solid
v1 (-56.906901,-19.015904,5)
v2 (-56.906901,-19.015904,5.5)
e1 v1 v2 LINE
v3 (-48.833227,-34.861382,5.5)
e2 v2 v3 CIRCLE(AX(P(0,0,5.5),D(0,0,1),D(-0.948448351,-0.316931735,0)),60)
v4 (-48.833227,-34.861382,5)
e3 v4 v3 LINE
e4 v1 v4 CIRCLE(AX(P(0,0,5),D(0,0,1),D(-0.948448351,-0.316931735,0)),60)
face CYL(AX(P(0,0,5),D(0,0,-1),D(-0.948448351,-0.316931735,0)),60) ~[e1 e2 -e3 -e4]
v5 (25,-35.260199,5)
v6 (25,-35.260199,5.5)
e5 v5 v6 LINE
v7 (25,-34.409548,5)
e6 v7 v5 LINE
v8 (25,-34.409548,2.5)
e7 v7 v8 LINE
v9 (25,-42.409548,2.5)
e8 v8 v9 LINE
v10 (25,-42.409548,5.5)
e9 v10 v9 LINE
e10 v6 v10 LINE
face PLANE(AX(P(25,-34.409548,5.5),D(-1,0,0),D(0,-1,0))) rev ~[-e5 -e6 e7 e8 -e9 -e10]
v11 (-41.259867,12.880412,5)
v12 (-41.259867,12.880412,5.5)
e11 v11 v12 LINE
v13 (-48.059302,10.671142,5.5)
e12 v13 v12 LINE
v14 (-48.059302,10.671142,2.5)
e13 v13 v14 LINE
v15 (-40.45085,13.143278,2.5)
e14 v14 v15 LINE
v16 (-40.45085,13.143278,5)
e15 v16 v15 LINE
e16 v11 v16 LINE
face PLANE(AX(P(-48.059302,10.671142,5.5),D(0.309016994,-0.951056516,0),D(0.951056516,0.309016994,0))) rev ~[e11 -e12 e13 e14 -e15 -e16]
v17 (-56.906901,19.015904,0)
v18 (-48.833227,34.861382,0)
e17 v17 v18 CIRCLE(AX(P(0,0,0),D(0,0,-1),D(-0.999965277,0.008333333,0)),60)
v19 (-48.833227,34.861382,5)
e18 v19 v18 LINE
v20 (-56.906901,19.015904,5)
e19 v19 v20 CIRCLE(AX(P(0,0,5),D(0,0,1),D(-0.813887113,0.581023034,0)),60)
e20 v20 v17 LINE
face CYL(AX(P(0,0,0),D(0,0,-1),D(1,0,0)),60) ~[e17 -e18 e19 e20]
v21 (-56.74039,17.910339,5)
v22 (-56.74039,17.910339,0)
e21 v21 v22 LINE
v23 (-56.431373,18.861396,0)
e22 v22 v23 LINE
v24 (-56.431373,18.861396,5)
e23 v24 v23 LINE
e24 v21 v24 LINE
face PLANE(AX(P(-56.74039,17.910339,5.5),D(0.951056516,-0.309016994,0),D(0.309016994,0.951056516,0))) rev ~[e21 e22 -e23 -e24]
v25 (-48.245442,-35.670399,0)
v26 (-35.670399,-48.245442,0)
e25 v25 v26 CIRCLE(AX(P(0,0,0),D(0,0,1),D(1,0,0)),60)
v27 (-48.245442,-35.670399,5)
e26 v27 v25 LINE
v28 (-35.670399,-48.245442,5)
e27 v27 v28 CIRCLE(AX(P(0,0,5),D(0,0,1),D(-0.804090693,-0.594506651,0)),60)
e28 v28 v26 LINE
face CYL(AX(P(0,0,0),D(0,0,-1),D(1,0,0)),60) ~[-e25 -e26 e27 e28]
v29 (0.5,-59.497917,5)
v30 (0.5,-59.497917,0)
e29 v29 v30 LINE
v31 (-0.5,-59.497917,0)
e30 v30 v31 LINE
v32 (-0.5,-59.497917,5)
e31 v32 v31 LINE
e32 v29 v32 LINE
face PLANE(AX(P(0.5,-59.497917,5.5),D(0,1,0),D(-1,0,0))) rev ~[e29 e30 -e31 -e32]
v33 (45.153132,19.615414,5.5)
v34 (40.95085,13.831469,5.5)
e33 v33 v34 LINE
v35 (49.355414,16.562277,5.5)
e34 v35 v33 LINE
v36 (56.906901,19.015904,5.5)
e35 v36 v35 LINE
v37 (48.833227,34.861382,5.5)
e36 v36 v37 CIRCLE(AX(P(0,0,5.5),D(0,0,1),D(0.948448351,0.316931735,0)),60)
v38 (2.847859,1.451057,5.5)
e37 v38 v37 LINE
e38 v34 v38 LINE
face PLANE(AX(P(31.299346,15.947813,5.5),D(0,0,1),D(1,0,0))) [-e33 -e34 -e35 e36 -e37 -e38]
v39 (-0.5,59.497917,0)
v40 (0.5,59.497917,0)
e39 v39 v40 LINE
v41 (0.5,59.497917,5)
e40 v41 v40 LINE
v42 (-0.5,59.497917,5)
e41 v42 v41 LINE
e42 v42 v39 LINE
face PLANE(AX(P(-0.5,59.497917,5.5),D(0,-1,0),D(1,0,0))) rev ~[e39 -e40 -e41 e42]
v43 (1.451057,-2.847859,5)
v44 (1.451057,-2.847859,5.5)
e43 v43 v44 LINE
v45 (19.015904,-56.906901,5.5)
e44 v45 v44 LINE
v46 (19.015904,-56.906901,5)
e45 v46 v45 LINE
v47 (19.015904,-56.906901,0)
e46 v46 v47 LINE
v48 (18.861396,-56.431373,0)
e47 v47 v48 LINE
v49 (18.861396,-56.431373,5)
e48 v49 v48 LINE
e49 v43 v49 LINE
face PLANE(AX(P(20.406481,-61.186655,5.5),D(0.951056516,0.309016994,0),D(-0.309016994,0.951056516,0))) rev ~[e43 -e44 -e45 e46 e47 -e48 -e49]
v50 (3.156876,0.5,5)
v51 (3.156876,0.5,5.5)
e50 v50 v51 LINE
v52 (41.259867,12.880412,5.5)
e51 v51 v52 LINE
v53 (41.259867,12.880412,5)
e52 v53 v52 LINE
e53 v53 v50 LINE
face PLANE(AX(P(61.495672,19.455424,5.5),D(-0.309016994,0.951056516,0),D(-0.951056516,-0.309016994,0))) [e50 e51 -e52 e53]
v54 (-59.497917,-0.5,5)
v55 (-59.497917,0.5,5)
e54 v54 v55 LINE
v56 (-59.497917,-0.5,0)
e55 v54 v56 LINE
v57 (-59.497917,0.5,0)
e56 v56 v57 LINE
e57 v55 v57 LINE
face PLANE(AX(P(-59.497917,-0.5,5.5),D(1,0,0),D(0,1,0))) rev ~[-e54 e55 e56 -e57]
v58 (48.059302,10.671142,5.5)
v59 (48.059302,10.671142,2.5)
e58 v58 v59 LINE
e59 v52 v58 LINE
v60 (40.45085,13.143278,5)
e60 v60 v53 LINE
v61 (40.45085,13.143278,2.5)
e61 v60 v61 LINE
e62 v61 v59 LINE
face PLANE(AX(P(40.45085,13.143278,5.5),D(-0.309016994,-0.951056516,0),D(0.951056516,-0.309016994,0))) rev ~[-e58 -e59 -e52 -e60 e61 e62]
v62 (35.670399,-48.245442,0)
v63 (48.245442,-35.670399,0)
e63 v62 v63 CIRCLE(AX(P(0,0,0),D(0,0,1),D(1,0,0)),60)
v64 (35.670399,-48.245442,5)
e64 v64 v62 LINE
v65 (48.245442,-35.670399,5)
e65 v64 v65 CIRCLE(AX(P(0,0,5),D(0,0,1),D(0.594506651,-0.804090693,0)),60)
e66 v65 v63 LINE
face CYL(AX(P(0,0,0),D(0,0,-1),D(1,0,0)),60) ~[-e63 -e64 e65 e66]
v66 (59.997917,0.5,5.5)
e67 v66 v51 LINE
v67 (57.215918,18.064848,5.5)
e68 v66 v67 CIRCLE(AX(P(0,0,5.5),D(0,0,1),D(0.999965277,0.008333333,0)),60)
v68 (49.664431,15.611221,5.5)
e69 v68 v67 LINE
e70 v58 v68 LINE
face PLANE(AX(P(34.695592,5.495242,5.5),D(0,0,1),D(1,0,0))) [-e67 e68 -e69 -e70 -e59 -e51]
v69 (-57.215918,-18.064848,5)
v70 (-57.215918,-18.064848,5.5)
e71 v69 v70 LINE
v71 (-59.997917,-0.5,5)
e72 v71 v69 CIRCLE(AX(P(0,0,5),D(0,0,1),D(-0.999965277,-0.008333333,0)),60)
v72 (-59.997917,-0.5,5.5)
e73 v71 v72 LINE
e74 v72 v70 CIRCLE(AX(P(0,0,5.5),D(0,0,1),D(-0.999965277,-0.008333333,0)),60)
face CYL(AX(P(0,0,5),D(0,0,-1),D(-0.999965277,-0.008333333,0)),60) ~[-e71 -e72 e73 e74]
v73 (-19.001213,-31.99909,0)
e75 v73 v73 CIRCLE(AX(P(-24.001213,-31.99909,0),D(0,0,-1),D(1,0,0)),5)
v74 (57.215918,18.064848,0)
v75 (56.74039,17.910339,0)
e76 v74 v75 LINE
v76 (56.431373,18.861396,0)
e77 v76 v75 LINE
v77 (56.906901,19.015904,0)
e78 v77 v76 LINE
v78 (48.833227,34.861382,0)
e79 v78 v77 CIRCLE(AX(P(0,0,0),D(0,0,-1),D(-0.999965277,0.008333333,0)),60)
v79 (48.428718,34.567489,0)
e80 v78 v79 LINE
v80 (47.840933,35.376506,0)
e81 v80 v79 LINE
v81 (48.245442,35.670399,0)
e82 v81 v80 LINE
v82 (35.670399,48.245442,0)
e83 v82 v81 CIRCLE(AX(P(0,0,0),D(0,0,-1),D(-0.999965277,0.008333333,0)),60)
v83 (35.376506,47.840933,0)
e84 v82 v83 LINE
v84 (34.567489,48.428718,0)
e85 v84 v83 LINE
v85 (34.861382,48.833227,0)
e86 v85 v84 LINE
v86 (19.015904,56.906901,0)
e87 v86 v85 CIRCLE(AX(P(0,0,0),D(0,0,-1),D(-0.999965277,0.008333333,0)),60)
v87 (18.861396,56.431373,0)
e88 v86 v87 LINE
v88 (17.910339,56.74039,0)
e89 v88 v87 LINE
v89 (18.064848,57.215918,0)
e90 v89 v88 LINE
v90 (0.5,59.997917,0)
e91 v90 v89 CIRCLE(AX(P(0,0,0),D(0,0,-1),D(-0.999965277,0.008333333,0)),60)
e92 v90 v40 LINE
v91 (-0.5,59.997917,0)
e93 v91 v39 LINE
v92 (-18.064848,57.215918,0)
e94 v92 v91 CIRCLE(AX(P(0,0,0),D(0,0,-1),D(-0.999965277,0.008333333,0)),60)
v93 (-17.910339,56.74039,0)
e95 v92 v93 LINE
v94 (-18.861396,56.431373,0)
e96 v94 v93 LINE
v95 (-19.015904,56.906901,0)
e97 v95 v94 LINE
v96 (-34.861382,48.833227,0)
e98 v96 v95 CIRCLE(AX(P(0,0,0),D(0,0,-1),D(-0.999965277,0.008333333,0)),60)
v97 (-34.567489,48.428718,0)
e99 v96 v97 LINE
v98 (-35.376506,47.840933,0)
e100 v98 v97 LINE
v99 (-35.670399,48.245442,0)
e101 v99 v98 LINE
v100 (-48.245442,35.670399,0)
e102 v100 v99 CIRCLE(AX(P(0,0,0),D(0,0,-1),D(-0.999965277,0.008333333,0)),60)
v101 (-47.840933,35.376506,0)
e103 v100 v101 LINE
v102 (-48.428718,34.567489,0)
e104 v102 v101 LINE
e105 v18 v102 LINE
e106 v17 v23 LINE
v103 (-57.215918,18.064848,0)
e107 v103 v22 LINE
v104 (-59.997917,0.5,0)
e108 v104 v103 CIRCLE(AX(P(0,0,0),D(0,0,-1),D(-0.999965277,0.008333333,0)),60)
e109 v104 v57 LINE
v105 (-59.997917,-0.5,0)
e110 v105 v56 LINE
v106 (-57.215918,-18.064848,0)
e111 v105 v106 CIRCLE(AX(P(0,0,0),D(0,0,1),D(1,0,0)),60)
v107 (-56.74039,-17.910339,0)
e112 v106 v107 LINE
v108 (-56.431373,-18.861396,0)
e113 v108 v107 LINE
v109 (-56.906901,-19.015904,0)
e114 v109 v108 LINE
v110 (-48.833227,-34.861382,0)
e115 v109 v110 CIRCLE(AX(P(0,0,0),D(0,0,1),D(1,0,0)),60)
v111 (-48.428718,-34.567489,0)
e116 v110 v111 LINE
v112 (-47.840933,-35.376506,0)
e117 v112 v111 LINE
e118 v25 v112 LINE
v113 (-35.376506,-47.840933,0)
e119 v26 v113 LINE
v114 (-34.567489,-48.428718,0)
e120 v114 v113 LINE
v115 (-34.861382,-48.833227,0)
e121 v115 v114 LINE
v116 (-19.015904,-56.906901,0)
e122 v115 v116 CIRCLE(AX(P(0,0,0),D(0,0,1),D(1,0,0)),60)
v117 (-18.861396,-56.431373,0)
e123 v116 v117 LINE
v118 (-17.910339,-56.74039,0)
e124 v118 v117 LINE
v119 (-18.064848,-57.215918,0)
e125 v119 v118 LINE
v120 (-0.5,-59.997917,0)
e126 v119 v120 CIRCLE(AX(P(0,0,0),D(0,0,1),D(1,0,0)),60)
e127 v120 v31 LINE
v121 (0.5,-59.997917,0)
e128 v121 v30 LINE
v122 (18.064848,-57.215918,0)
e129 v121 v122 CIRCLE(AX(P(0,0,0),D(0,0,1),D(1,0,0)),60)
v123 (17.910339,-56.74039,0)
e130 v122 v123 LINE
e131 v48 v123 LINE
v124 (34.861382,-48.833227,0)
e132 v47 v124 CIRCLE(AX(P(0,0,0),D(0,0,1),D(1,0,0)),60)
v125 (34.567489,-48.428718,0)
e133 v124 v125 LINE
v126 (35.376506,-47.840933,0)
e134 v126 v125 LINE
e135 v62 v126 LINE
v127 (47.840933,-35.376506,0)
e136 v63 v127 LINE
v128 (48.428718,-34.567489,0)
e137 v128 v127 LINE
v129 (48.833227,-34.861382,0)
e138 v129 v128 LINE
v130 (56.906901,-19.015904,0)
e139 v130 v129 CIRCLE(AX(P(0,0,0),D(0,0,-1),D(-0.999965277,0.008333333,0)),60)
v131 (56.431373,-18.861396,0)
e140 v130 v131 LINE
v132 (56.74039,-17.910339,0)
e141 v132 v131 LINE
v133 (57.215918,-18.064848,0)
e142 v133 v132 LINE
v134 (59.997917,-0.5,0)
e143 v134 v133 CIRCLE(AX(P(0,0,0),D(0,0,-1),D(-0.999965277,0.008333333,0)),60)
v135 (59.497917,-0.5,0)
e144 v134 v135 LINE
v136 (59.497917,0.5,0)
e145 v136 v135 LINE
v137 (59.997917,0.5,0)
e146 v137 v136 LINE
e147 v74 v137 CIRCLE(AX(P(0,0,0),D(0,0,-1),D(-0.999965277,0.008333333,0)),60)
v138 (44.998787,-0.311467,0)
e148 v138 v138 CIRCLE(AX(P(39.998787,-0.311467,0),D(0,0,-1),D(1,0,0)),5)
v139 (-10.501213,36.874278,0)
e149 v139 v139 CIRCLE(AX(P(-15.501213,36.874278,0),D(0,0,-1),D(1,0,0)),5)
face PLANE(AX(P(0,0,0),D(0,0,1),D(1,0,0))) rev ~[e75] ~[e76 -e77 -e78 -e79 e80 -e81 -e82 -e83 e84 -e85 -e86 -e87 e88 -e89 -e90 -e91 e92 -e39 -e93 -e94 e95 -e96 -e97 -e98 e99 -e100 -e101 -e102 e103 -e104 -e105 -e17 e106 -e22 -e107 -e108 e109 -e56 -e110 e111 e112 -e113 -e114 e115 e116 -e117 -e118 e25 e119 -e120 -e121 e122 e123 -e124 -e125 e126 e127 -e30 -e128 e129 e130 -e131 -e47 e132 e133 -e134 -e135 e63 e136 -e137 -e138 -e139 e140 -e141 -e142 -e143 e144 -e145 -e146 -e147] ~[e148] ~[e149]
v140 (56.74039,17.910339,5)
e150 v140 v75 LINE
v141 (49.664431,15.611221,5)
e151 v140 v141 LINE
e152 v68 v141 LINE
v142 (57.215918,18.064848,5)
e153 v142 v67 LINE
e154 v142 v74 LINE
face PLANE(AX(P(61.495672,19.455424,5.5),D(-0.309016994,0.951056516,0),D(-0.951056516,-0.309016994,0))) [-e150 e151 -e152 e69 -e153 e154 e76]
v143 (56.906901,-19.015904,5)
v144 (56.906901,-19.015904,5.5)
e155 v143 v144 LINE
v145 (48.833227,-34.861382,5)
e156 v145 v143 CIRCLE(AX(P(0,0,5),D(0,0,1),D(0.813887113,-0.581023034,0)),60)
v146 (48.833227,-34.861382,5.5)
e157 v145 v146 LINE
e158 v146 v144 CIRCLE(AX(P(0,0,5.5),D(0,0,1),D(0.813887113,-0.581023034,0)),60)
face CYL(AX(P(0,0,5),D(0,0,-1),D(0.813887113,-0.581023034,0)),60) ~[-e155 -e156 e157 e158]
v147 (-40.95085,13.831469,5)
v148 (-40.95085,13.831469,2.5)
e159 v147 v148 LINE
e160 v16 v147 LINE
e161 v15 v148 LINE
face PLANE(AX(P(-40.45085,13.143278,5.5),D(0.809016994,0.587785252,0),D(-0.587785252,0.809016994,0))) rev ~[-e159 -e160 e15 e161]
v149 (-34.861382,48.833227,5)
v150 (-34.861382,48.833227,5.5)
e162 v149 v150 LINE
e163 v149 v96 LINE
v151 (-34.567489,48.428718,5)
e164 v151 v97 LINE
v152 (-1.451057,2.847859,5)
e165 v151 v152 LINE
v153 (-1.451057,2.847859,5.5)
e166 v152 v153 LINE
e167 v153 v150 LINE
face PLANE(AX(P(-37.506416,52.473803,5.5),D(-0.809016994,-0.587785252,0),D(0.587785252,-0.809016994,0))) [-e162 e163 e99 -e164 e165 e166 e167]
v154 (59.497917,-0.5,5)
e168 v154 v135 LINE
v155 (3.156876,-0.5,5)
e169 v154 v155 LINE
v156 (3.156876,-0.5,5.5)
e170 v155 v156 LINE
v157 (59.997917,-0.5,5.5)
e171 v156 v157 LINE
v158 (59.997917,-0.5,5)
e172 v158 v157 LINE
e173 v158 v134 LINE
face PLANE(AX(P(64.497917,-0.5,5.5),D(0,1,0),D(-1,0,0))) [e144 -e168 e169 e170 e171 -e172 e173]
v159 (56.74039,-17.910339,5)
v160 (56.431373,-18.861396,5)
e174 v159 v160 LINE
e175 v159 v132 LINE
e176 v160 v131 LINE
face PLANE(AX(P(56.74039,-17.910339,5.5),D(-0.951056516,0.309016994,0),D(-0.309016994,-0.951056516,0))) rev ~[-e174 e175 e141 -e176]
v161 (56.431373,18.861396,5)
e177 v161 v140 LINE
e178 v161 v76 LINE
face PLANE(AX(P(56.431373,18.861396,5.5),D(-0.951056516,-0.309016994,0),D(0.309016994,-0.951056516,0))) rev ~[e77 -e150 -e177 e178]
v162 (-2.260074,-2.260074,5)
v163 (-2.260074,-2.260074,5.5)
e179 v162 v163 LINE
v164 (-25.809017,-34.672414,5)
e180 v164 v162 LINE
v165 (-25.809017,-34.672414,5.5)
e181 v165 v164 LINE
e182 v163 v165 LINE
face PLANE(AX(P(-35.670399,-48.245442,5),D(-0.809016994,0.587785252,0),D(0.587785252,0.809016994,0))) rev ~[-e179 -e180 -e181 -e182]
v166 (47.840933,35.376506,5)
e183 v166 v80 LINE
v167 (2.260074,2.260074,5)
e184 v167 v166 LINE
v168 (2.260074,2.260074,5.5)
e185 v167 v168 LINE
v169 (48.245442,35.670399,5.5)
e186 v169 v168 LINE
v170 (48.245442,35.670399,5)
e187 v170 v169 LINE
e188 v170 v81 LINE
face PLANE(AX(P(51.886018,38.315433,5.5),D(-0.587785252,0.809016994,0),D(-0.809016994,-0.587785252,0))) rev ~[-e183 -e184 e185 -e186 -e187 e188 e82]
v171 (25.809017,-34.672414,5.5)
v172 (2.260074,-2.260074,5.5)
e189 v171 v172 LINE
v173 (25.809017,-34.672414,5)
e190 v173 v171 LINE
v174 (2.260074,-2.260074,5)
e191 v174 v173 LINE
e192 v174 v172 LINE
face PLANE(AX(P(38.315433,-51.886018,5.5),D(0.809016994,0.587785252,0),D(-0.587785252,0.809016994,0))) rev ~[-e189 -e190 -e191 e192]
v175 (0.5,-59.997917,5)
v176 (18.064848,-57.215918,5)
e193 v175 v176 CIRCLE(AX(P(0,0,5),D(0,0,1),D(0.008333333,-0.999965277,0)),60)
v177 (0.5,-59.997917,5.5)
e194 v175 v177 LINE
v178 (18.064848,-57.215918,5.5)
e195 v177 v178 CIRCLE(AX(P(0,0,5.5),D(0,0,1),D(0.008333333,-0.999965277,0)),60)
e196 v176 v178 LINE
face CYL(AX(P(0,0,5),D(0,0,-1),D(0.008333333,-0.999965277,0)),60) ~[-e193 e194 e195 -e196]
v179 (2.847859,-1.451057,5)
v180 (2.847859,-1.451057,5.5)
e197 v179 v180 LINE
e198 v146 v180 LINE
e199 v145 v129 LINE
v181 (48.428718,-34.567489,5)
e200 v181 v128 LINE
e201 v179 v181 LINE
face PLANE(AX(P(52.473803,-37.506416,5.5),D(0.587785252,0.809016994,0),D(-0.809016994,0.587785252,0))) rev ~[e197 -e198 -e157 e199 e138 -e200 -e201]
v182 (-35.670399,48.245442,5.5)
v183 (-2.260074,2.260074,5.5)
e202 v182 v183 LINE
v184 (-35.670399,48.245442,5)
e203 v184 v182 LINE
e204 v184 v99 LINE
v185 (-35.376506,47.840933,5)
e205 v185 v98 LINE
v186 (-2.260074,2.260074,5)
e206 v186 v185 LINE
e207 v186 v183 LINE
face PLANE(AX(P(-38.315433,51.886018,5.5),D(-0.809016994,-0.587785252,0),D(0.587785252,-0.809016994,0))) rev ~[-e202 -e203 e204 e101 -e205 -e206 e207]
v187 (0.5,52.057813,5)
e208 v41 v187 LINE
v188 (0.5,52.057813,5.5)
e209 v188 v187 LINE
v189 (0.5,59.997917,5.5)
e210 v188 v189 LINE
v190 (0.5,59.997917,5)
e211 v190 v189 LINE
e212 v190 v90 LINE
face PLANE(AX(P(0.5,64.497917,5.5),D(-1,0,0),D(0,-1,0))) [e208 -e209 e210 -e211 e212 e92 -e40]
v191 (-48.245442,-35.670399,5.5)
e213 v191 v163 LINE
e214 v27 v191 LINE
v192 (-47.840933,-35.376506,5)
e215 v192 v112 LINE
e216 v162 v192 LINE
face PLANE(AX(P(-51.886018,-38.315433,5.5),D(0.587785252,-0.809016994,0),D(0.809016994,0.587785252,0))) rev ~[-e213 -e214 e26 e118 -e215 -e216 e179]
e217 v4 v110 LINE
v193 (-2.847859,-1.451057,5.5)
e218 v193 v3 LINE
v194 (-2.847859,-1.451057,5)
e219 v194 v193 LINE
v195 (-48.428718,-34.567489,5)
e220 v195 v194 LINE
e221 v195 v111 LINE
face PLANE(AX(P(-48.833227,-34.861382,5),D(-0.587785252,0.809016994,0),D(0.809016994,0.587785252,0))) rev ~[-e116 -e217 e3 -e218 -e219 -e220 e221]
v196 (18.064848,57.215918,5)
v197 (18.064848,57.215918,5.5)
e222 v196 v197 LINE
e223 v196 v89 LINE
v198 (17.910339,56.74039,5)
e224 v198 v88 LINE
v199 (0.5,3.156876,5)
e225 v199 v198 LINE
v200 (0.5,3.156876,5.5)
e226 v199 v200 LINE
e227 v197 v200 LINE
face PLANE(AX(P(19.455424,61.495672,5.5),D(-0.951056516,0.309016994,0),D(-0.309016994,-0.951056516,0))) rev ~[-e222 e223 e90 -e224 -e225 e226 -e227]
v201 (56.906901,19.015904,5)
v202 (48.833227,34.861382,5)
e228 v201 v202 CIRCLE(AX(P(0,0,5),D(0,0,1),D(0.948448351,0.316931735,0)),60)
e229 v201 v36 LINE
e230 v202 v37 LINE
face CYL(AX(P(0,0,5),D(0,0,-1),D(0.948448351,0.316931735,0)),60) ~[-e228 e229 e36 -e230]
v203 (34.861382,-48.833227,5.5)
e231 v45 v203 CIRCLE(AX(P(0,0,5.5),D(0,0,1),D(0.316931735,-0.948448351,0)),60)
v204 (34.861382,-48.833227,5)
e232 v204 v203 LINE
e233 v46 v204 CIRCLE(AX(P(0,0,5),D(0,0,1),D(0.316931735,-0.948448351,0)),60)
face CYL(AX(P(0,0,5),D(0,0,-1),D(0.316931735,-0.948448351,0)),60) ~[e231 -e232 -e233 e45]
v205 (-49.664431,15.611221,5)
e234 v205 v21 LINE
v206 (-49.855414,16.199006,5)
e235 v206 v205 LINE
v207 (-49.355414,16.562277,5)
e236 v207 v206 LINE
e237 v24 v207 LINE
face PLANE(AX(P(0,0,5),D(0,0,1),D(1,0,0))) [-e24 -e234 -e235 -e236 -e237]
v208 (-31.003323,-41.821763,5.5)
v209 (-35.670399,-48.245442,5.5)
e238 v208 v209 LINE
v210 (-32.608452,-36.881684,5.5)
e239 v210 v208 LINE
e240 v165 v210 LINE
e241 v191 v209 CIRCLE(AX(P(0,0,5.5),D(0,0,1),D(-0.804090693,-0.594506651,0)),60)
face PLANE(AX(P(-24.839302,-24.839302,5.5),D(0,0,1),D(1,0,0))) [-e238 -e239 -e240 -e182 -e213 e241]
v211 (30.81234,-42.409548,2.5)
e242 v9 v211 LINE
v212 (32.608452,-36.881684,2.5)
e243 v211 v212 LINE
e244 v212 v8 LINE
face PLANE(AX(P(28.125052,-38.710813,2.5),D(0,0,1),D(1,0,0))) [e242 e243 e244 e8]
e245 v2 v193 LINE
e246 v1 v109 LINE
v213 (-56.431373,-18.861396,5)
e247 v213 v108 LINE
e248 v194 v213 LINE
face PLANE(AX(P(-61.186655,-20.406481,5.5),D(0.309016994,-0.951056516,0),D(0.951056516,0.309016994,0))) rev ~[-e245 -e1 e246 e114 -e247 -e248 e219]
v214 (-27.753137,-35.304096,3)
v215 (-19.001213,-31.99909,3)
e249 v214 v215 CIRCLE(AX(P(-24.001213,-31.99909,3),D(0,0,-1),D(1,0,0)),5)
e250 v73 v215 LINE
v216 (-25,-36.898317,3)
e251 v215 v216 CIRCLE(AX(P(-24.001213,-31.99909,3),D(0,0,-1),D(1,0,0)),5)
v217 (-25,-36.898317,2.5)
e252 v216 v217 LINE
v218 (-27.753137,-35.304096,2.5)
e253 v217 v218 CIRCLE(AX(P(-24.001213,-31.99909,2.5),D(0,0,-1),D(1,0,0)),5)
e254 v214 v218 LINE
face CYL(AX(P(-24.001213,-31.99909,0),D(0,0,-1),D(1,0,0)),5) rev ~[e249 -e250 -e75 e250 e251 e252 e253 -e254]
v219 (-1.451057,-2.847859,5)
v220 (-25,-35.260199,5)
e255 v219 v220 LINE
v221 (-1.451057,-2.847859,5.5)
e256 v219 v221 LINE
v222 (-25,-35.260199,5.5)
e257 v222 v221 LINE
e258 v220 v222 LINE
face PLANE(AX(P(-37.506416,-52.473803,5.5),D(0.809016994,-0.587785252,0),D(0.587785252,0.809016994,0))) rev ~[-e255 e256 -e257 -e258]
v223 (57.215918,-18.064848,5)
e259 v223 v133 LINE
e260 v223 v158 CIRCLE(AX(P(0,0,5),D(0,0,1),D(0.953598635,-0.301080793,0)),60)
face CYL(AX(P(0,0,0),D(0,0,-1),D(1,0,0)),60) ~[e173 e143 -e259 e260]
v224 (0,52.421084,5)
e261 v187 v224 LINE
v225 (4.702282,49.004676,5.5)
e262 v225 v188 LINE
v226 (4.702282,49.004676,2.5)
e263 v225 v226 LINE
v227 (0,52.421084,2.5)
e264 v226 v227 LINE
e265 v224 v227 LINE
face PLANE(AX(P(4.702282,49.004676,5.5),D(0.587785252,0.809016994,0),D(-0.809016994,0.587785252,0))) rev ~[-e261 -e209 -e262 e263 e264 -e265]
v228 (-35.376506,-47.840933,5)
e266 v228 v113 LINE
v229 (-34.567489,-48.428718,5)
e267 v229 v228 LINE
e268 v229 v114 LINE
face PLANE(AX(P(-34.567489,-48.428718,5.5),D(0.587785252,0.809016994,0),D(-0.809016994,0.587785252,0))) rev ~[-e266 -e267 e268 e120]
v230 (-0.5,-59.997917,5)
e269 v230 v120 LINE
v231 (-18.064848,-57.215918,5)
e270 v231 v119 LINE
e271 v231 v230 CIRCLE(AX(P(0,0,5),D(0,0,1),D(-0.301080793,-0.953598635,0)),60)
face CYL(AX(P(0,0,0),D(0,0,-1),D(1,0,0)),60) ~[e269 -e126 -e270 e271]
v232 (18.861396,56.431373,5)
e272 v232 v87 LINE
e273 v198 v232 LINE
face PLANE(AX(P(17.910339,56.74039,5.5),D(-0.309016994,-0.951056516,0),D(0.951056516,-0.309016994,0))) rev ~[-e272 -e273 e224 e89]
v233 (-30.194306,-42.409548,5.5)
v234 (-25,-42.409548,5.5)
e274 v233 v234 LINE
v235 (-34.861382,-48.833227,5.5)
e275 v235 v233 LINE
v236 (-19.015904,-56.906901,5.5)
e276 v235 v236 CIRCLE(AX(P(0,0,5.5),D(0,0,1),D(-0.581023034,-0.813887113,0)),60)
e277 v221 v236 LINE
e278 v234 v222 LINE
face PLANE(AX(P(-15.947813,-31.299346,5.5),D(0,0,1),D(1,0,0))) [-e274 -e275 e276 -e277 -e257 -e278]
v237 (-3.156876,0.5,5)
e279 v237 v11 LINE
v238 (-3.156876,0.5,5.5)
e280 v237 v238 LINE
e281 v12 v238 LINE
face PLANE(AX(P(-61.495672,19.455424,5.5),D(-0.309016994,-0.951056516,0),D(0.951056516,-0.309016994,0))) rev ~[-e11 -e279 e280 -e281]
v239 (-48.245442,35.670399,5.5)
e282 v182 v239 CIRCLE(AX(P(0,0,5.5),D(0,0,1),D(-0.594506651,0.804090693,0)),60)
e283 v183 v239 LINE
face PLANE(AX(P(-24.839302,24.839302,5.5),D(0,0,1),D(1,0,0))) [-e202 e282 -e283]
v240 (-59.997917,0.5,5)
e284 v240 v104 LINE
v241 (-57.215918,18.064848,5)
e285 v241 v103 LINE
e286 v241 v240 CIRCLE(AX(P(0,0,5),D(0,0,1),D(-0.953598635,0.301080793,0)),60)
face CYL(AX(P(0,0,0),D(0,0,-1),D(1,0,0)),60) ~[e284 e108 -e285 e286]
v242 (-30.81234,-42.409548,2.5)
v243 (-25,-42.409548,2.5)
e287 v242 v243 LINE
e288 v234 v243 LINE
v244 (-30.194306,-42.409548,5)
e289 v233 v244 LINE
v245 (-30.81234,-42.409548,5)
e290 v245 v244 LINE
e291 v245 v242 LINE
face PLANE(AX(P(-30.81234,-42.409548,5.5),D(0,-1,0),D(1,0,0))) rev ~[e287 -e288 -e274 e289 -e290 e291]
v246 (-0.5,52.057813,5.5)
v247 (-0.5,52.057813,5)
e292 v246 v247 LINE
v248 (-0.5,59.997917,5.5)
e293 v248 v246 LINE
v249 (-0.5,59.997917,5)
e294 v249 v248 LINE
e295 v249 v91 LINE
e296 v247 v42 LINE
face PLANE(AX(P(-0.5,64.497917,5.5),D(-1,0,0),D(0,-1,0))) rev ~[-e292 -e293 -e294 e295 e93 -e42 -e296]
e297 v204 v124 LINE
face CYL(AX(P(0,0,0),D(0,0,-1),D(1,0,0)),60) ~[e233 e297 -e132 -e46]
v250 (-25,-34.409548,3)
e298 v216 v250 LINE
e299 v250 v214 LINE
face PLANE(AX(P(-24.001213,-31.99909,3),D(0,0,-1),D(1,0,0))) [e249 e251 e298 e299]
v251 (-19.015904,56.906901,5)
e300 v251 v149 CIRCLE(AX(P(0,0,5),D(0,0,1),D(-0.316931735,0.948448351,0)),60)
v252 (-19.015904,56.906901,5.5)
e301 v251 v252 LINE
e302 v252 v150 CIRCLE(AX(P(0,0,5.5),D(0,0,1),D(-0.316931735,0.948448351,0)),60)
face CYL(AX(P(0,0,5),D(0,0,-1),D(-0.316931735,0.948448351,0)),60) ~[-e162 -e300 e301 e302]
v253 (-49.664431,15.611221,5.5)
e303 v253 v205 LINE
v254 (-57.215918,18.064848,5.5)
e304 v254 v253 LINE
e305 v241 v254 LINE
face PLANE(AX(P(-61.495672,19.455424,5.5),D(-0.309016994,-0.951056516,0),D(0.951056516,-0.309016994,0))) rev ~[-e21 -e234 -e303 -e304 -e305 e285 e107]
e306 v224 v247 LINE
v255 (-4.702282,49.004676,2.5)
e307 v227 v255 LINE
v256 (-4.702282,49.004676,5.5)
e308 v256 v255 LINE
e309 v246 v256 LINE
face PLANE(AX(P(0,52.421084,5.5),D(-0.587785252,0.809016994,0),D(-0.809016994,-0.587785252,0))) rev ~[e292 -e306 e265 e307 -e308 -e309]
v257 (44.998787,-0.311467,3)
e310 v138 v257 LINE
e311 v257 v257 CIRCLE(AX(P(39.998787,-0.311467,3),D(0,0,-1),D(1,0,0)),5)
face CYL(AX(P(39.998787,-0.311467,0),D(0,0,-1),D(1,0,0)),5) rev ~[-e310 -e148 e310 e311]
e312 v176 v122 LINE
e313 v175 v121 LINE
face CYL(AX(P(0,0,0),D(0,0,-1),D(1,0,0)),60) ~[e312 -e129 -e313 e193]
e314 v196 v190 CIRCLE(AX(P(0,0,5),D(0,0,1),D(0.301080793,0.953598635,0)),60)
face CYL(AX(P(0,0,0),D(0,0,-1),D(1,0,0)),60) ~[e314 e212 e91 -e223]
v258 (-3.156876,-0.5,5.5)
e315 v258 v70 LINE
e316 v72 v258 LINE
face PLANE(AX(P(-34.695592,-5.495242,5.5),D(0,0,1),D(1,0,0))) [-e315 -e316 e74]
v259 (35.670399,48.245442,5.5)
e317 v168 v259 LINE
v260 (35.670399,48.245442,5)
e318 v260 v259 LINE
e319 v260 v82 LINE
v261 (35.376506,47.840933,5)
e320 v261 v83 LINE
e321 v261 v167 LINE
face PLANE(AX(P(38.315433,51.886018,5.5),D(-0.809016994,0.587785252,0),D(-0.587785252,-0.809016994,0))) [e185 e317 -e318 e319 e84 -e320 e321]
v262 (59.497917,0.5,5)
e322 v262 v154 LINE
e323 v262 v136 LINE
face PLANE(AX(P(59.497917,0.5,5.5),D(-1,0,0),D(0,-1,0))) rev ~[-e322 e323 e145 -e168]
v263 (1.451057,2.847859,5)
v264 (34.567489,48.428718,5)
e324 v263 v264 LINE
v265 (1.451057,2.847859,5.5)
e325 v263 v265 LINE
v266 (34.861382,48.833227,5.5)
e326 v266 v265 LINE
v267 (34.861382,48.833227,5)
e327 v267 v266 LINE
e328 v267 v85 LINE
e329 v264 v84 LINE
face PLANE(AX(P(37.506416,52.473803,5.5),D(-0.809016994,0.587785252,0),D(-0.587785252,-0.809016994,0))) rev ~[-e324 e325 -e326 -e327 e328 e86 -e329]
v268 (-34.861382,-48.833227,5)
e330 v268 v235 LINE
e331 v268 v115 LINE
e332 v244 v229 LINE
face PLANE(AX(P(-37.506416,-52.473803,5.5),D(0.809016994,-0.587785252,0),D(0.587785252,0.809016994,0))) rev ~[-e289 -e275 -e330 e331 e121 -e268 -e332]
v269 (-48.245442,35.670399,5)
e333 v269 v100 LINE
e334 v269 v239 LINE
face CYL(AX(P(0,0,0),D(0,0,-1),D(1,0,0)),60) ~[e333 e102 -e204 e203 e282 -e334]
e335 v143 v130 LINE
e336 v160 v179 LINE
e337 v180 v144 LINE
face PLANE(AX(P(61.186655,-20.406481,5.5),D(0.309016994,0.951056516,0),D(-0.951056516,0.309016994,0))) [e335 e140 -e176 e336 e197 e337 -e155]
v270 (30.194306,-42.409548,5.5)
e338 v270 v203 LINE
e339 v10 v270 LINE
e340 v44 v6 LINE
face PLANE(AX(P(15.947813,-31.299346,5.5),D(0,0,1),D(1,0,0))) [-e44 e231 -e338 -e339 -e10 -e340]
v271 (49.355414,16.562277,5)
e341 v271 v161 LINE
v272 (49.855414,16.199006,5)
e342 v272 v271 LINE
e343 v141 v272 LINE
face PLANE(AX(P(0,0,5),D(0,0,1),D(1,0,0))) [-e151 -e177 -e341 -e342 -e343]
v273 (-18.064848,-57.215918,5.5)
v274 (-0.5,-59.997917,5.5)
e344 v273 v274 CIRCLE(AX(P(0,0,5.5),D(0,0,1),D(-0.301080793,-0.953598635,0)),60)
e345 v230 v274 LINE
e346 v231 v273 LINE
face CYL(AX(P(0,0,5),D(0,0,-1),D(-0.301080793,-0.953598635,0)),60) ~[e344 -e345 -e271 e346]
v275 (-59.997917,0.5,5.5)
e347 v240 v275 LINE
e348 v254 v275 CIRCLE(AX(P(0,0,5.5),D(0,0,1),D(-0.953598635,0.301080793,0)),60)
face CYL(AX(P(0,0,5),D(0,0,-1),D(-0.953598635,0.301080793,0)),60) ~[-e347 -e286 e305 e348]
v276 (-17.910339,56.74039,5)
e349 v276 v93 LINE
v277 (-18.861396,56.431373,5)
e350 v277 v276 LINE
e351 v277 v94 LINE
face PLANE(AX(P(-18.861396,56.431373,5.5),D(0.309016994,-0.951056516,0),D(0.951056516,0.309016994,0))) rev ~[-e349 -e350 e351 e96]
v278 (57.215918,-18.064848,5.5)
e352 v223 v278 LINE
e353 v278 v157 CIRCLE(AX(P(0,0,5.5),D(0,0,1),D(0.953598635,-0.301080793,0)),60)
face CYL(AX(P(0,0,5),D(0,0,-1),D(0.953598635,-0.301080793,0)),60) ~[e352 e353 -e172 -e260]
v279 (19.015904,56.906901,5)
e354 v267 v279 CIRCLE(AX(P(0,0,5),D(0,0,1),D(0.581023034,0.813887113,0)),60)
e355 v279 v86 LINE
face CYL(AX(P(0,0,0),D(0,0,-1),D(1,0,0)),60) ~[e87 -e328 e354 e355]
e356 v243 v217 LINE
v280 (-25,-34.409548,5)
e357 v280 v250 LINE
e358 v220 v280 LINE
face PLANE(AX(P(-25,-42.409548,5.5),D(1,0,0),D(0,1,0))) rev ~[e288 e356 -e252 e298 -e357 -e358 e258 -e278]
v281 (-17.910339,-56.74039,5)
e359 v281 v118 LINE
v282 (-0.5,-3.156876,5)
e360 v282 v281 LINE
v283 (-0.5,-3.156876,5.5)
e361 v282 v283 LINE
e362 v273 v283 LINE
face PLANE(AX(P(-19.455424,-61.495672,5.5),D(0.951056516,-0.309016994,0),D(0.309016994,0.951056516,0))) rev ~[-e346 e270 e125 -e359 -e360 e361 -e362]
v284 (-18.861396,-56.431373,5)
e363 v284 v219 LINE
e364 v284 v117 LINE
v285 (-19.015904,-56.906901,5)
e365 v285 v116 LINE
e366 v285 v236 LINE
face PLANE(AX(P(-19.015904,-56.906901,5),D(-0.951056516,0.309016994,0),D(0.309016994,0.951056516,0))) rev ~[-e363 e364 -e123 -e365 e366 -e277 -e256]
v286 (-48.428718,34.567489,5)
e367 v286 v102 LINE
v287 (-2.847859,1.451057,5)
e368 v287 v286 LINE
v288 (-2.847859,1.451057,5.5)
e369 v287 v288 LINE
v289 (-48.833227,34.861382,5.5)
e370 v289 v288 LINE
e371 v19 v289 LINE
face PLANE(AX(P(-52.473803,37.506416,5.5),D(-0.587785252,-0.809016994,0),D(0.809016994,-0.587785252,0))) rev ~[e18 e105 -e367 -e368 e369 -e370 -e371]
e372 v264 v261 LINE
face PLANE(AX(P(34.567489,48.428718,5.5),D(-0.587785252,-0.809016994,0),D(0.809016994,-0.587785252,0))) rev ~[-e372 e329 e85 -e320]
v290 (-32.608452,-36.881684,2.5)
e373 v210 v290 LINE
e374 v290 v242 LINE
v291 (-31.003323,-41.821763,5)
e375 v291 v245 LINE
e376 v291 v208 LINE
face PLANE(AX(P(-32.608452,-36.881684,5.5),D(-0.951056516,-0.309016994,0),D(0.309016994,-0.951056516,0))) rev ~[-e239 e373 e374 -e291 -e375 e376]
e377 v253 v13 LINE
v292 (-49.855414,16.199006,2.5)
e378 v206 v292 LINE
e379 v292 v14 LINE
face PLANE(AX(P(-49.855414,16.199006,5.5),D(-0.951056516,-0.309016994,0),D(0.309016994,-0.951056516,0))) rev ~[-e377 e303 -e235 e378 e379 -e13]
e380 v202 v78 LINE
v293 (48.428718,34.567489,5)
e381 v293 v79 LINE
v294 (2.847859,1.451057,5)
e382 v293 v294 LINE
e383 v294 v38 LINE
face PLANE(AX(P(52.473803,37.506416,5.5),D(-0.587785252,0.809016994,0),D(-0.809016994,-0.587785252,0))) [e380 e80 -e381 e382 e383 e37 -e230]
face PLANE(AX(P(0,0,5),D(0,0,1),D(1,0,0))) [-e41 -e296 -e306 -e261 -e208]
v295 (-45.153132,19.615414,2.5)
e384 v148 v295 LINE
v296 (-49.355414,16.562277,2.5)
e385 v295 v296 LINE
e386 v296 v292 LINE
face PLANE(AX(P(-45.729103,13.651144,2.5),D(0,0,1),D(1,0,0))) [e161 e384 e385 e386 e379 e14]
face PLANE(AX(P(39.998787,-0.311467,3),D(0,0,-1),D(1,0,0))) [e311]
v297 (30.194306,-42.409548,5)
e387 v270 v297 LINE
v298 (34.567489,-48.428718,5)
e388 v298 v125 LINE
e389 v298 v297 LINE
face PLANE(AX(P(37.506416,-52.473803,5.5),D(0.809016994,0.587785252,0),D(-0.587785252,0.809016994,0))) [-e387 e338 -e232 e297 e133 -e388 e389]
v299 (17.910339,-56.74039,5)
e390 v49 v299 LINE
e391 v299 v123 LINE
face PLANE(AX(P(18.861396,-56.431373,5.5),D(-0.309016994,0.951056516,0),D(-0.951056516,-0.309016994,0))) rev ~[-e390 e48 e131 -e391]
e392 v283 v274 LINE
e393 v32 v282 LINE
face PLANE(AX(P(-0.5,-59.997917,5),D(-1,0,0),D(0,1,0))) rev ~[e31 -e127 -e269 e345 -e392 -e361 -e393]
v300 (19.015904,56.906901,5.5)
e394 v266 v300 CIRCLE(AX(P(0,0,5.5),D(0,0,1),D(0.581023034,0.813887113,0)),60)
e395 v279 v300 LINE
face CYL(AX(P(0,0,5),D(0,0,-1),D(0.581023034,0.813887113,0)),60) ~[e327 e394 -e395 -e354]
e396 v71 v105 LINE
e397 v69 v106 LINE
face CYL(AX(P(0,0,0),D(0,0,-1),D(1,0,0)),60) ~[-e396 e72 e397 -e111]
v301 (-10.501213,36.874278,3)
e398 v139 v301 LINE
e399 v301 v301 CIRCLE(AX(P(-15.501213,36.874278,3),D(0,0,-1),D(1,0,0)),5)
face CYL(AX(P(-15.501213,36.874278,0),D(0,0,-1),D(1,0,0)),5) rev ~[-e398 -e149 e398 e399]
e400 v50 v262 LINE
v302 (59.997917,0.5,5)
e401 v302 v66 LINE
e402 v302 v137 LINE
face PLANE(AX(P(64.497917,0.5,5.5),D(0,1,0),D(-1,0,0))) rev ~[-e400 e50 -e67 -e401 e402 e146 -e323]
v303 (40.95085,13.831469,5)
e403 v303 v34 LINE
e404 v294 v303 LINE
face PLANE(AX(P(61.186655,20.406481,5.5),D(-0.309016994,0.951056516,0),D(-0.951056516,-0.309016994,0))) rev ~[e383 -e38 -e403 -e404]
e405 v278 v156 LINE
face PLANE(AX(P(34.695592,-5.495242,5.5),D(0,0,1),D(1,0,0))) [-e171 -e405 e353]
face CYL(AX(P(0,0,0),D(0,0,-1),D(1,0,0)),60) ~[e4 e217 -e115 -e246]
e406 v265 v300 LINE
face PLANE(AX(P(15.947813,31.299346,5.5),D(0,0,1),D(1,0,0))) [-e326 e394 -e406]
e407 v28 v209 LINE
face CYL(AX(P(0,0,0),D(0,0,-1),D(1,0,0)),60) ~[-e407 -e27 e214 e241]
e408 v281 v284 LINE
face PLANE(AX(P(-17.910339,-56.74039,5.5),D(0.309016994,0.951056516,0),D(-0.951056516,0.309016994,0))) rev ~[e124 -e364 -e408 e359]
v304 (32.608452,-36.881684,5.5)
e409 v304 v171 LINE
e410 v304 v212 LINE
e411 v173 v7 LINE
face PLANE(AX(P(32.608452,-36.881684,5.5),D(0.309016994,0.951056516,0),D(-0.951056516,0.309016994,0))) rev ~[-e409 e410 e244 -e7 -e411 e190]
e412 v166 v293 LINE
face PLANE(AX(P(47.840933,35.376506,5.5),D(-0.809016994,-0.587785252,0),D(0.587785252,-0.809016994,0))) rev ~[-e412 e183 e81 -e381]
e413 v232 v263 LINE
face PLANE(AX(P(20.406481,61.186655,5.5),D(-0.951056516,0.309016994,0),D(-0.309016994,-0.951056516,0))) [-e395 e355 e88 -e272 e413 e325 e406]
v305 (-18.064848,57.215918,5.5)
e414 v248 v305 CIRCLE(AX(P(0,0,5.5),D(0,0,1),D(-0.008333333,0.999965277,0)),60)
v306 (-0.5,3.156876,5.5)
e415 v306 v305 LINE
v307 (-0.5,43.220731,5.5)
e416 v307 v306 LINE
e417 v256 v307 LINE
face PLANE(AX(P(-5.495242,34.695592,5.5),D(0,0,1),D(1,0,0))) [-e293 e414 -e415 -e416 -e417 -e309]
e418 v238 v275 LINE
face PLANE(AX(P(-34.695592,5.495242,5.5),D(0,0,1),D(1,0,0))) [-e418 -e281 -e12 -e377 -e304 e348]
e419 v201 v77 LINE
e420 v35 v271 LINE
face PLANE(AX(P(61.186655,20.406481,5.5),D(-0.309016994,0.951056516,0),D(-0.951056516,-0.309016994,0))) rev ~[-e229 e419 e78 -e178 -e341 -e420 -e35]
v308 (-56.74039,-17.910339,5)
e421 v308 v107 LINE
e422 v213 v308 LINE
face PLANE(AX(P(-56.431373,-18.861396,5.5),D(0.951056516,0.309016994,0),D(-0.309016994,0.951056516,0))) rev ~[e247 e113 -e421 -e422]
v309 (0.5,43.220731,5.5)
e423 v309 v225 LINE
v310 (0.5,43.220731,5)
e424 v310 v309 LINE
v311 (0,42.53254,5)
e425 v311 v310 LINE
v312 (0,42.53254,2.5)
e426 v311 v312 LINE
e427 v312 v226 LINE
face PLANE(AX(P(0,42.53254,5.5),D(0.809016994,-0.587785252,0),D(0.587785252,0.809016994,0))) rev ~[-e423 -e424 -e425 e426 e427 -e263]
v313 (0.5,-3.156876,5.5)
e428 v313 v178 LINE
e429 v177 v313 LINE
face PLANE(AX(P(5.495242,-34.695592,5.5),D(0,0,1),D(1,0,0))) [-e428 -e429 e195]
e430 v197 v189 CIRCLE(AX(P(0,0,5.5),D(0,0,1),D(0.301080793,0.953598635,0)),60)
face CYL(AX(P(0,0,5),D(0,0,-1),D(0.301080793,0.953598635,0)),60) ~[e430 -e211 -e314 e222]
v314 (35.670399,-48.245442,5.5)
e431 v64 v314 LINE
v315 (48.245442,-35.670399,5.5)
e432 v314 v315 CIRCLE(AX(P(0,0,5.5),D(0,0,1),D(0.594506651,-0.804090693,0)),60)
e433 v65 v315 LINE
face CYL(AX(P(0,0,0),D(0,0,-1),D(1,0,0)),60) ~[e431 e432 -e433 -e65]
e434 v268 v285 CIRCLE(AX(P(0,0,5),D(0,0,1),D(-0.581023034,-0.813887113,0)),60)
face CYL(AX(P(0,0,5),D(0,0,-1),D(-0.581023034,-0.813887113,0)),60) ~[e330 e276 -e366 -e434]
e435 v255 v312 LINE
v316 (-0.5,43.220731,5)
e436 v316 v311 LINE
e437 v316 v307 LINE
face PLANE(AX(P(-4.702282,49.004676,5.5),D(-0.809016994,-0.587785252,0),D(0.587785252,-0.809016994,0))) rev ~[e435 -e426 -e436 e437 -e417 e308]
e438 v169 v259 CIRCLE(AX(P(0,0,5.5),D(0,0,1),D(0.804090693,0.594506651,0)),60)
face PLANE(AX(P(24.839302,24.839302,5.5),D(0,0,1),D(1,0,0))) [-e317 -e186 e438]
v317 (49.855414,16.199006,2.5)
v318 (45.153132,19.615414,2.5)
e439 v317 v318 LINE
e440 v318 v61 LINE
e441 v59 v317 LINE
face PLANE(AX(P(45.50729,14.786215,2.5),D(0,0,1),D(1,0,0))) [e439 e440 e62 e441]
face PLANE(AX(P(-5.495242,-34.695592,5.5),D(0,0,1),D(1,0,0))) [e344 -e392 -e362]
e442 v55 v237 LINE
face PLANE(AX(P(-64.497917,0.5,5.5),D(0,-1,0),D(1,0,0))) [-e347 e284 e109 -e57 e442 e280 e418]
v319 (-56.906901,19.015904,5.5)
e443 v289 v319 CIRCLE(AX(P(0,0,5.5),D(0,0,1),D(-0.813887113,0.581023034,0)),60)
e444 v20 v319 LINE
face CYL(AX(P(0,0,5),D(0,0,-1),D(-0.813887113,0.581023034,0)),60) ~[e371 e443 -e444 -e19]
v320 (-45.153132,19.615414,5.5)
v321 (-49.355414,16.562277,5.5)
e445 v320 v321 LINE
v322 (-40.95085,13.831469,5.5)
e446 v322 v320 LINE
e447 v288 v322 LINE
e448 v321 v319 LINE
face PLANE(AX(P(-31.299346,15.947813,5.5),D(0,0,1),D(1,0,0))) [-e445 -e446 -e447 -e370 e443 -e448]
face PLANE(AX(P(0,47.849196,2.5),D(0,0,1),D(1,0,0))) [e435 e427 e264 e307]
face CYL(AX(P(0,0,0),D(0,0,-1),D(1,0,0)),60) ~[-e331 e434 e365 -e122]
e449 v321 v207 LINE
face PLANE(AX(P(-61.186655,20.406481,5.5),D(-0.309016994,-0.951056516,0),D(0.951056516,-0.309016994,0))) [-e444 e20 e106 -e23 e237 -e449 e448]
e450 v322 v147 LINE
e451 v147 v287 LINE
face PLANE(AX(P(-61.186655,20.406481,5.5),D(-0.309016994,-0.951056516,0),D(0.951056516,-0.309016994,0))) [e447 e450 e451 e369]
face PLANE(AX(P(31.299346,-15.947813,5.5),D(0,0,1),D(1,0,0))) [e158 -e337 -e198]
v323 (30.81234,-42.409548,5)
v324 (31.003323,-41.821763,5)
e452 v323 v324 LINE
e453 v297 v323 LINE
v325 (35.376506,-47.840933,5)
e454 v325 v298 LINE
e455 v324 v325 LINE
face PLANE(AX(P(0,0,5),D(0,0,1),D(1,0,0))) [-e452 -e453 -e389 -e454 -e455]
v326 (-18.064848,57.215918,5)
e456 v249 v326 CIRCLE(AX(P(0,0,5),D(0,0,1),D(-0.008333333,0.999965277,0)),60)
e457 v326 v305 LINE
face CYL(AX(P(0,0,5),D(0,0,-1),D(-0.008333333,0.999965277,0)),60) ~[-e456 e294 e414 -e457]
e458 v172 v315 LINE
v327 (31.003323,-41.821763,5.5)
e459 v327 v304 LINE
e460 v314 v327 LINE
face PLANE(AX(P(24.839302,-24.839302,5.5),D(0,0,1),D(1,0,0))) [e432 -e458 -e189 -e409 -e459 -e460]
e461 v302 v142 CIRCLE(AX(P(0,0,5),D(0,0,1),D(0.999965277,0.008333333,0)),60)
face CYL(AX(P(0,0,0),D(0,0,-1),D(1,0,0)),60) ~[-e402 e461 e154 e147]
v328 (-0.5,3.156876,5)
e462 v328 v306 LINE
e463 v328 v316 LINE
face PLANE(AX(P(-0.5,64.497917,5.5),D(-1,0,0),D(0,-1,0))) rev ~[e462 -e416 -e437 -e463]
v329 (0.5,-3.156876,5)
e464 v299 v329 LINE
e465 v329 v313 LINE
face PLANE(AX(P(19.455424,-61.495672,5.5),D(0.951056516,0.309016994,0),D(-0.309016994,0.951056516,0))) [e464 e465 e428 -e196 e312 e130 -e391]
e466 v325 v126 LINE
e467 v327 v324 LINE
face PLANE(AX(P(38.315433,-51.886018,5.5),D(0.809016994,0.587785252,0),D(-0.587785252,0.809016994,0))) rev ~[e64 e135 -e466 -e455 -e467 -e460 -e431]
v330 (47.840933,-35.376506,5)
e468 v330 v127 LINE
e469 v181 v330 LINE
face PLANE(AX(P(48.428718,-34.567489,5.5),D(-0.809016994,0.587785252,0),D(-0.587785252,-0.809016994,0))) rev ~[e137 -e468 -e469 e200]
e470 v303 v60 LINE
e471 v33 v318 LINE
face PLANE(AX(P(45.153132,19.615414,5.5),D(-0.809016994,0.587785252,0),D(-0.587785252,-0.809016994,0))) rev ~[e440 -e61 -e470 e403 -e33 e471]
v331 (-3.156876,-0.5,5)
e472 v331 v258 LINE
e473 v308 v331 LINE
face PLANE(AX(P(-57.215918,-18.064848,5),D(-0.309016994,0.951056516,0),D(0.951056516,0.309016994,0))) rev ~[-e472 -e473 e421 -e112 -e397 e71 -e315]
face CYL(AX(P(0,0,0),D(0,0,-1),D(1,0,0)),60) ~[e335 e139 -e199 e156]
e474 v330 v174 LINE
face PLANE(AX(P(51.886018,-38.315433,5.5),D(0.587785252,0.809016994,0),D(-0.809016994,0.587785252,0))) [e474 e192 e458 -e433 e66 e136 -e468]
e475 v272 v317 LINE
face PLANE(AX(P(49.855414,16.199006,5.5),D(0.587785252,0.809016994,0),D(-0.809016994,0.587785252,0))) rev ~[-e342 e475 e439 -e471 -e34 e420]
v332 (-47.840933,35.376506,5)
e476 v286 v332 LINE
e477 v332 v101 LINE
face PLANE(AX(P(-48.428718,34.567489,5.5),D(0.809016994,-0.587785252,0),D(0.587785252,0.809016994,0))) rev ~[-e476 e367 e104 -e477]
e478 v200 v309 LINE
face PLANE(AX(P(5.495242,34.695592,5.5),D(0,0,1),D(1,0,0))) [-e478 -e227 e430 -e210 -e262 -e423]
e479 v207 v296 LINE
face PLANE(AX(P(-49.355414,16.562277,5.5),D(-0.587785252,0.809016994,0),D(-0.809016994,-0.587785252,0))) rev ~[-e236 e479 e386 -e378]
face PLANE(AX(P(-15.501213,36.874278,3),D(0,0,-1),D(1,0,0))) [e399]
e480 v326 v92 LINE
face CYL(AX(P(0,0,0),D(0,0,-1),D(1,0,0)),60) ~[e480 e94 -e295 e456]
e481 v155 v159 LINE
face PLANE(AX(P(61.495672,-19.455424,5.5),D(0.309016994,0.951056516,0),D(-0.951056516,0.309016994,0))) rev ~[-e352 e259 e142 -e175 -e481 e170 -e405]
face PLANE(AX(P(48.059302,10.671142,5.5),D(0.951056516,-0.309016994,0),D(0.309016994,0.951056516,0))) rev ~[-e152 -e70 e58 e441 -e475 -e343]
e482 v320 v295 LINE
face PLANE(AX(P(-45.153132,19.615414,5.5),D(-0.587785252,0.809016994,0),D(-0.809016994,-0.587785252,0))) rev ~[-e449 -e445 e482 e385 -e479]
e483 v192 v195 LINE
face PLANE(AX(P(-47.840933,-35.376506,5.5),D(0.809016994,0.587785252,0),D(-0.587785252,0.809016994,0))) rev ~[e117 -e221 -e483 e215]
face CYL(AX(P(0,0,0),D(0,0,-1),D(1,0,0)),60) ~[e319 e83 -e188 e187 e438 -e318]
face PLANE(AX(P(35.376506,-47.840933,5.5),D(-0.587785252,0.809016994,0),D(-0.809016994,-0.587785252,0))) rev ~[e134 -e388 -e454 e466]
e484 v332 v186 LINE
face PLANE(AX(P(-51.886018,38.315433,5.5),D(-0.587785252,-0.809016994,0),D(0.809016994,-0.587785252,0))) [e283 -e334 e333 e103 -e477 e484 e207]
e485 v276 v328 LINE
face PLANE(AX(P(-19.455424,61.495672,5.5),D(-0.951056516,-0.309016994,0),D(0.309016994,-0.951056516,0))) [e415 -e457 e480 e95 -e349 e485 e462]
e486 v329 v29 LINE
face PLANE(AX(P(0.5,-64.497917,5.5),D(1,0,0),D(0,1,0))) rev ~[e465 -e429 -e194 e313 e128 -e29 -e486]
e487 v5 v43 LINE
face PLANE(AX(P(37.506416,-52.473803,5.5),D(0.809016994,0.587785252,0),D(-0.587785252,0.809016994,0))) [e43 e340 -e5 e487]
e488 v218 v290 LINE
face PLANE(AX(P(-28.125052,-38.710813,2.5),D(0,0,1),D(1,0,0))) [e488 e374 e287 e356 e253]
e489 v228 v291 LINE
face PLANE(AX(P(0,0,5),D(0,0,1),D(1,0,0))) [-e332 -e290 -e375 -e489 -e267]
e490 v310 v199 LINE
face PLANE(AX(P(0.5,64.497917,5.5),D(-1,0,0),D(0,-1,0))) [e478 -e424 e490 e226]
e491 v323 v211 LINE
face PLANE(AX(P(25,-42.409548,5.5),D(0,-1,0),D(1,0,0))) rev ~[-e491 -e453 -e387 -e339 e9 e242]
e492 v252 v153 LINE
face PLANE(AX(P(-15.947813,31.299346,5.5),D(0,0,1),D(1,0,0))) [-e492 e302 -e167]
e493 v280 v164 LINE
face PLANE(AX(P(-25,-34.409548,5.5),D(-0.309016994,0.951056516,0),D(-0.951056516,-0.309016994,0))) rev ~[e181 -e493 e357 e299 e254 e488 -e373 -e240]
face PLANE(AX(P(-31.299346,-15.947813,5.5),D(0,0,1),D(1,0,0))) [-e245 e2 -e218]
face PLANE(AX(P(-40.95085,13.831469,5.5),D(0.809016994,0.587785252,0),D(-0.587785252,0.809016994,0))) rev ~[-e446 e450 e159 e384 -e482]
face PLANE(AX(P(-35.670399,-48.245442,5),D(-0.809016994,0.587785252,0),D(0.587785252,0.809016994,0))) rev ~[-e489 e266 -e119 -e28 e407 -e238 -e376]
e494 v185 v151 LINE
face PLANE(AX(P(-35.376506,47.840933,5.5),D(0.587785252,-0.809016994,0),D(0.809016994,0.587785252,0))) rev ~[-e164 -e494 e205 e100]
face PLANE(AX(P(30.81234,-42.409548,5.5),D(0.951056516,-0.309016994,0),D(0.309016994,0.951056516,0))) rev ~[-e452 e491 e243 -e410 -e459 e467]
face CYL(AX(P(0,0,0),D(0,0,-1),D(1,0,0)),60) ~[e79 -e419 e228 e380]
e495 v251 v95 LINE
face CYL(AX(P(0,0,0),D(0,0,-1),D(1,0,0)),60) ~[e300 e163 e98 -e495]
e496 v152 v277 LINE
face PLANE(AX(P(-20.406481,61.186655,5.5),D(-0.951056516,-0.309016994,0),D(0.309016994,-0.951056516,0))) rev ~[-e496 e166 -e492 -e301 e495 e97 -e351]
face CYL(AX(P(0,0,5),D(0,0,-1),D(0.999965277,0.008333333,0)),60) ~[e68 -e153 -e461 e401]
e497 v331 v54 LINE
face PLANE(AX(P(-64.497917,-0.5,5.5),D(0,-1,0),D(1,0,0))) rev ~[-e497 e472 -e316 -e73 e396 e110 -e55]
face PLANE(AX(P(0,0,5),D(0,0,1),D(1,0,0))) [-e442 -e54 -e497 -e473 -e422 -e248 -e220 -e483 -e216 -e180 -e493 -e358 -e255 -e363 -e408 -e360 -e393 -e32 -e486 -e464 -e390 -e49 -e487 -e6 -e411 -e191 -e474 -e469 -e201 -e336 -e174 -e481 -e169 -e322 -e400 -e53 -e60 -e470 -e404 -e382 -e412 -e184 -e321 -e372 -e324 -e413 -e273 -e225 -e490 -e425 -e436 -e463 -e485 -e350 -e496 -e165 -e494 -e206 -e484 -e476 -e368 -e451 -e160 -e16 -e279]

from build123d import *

# Parameters (mm, degrees)
F0_R            = 60
F1_DEPTH        = 5
F3_DEPTH        = 0.5
F4_W            = 5
F4_H            = 1
F5_DEPTH        = 5.501
F5_COPIES_COUNT = 20
F8_DEPTH        = 3
F9_R            = 5
F10_DEPTH       = 3


# Not quite as in the source:
# - a pattern or mirror of a feature is missing from the dataset's text; its kind, count and spacing are read off the source's solid


with BuildPart() as f1:
    # F0 (on Top) → F1 (new body)
    with BuildSketch(Plane.XY):
        Circle(F0_R)
    extrude(amount=F1_DEPTH)

    # F2 (on face) → F3 (join)
    with BuildSketch(Plane.XY.offset(5)):
        with BuildLine():
            ThreePointArc((59.9979166305, 0.5), (59.2613004357, 9.3860679024), (57.2159180728, 18.0648476078))
            Line((57.2159180728, 18.0648476078), (3.1568757573, 0.5))
            Line((3.1568757573, 0.5), (59.9979166305, 0.5))
        make_face()
        with BuildLine():
            ThreePointArc((56.9069010784, 19.0159041241), (53.4603914513, 27.2394299844), (48.8332268073, 34.8613820665))
            Line((48.8332268073, 34.8613820665), (2.847858763, 1.4510565163))
            Line((2.847858763, 1.4510565163), (56.9069010784, 19.0159041241))
        make_face()
        with BuildLine():
            ThreePointArc((48.245441555, 35.6703990609), (42.4264068712, 42.4264068712), (35.6703990609, 48.245441555))
            Line((35.6703990609, 48.245441555), (2.2600735107, 2.2600735107))
            Line((2.2600735107, 2.2600735107), (48.245441555, 35.6703990609))
        make_face()
        with BuildLine():
            ThreePointArc((34.8613820665, 48.8332268073), (27.2394299844, 53.4603914513), (19.0159041241, 56.9069010784))
            Line((19.0159041241, 56.9069010784), (1.4510565163, 2.847858763))
            Line((1.4510565163, 2.847858763), (34.8613820665, 48.8332268073))
        make_face()
        with BuildLine():
            ThreePointArc((18.0648476078, 57.2159180728), (9.3860679024, 59.2613004357), (0.5, 59.9979166305))
            Line((0.5, 59.9979166305), (0.5, 3.1568757573))
            Line((0.5, 3.1568757573), (18.0648476078, 57.2159180728))
        make_face()
        with BuildLine():
            ThreePointArc((-0.5, 59.9979166305), (-9.3860679024, 59.2613004357), (-18.0648476078, 57.2159180728))
            Line((-18.0648476078, 57.2159180728), (-0.5, 3.1568757573))
            Line((-0.5, 3.1568757573), (-0.5, 59.9979166305))
        make_face()
        with BuildLine():
            ThreePointArc((-19.0159041241, 56.9069010784), (-27.2394299844, 53.4603914513), (-34.8613820665, 48.8332268073))
            Line((-34.8613820665, 48.8332268073), (-1.4510565163, 2.847858763))
            Line((-1.4510565163, 2.847858763), (-19.0159041241, 56.9069010784))
        make_face()
        with BuildLine():
            ThreePointArc((-35.6703990609, 48.245441555), (-42.4264068712, 42.4264068712), (-48.245441555, 35.6703990609))
            Line((-48.245441555, 35.6703990609), (-2.2600735107, 2.2600735107))
            Line((-2.2600735107, 2.2600735107), (-35.6703990609, 48.245441555))
        make_face()
        with BuildLine():
            ThreePointArc((-48.8332268073, 34.8613820665), (-53.4603914513, 27.2394299844), (-56.9069010784, 19.0159041241))
            Line((-56.9069010784, 19.0159041241), (-2.847858763, 1.4510565163))
            Line((-2.847858763, 1.4510565163), (-48.8332268073, 34.8613820665))
        make_face()
        with BuildLine():
            ThreePointArc((-57.2159180728, 18.0648476078), (-59.2613004357, 9.3860679024), (-59.9979166305, 0.5))
            Line((-59.9979166305, 0.5), (-3.1568757573, 0.5))
            Line((-3.1568757573, 0.5), (-57.2159180728, 18.0648476078))
        make_face()
        with BuildLine():
            Line((-3.1568757573, -0.5), (-59.9979166305, -0.5))
            ThreePointArc((-59.9979166305, -0.5), (-59.2613004357, -9.3860679024), (-57.2159180728, -18.0648476078))
            Line((-57.2159180728, -18.0648476078), (-3.1568757573, -0.5))
        make_face()
        with BuildLine():
            Line((-2.847858763, -1.4510565163), (-56.9069010784, -19.0159041241))
            ThreePointArc((-56.9069010784, -19.0159041241), (-53.4603914513, -27.2394299844), (-48.8332268073, -34.8613820665))
            Line((-48.8332268073, -34.8613820665), (-2.847858763, -1.4510565163))
        make_face()
        with BuildLine():
            Line((-2.2600735107, -2.2600735107), (-48.245441555, -35.6703990609))
            ThreePointArc((-48.245441555, -35.6703990609), (-42.4264068712, -42.4264068712), (-35.6703990609, -48.245441555))
            Line((-35.6703990609, -48.245441555), (-2.2600735107, -2.2600735107))
        make_face()
        with BuildLine():
            Line((-1.4510565163, -2.847858763), (-34.8613820665, -48.8332268073))
            ThreePointArc((-34.8613820665, -48.8332268073), (-27.2394299844, -53.4603914513), (-19.0159041241, -56.9069010784))
            Line((-19.0159041241, -56.9069010784), (-1.4510565163, -2.847858763))
        make_face()
        with BuildLine():
            Line((-0.5, -3.1568757573), (-18.0648476078, -57.2159180728))
            ThreePointArc((-18.0648476078, -57.2159180728), (-9.3860679024, -59.2613004357), (-0.5, -59.9979166305))
            Line((-0.5, -59.9979166305), (-0.5, -3.1568757573))
        make_face()
        with BuildLine():
            Line((0.5, -3.1568757573), (0.5, -59.9979166305))
            ThreePointArc((0.5, -59.9979166305), (9.3860679024, -59.2613004357), (18.0648476078, -57.2159180728))
            Line((18.0648476078, -57.2159180728), (0.5, -3.1568757573))
        make_face()
        with BuildLine():
            Line((1.4510565163, -2.847858763), (19.0159041241, -56.9069010784))
            ThreePointArc((19.0159041241, -56.9069010784), (27.2394299844, -53.4603914513), (34.8613820665, -48.8332268073))
            Line((34.8613820665, -48.8332268073), (1.4510565163, -2.847858763))
        make_face()
        with BuildLine():
            Line((2.2600735107, -2.2600735107), (35.6703990609, -48.245441555))
            ThreePointArc((35.6703990609, -48.245441555), (42.4264068712, -42.4264068712), (48.245441555, -35.6703990609))
            Line((48.245441555, -35.6703990609), (2.2600735107, -2.2600735107))
        make_face()
        with BuildLine():
            Line((2.847858763, -1.4510565163), (48.8332268073, -34.8613820665))
            ThreePointArc((48.8332268073, -34.8613820665), (53.4603914513, -27.2394299844), (56.9069010784, -19.0159041241))
            Line((56.9069010784, -19.0159041241), (2.847858763, -1.4510565163))
        make_face()
        with BuildLine():
            Line((3.1568757573, -0.5), (57.2159180728, -18.0648476078))
            ThreePointArc((57.2159180728, -18.0648476078), (59.2613004357, -9.3860679024), (59.9979166305, -0.5))
            Line((59.9979166305, -0.5), (3.1568757573, -0.5))
        make_face()
    extrude(amount=F3_DEPTH)

    # F4 (on face) → F5 (cut, through all)
    with BuildSketch(Plane.XY.offset(5.5)):
        with Locations((-61.9979166305, 0)):
            Rectangle(F4_W, F4_H)
    f5 = extrude(amount=-F5_DEPTH, mode=Mode.SUBTRACT)

    # F5_copies: F5 ×20 about axis
    f5_copies_axis = Axis((0, 0, 0), (0, 0, 1))
    for i in range(1, F5_COPIES_COUNT):
        add(f5.rotate(f5_copies_axis, i * 360 / F5_COPIES_COUNT), mode=Mode.SUBTRACT)

    # F7 (on face) → F8 (cut)
    with BuildSketch(Plane.XY.offset(5.5)):
        Polygon((-4.7022820183, 49.0046763726), (0, 42.5325404176), (4.7022820183, 49.0046763726), (0, 52.4210842376), align=None)
        Polygon((-48.0593018491, 10.671141848), (-40.4508497187, 13.143277803), (-40.9508497187, 13.8314687632), (-49.3554137554, 16.562277157), (-49.8554137554, 16.199005893), align=None)
        Polygon((-49.3554137554, 16.562277157), (-40.9508497187, 13.8314687632), (-45.1531317371, 19.615413758), align=None)
        Polygon((45.1531317371, 19.615413758), (40.4508497187, 13.143277803), (48.0593018491, 10.671141848), (49.8554137554, 16.199005893), align=None)
        Polygon((-25, -42.4095480118), (-25, -34.4095480118), (-32.6084521304, -36.8816839668), (-30.812340224, -42.4095480118), align=None)
        Polygon((32.6084521304, -36.8816839668), (25, -34.4095480118), (25, -42.4095480118), (30.812340224, -42.4095480118), align=None)
    extrude(amount=-F8_DEPTH, mode=Mode.SUBTRACT)

    # F9 (on face) → F10 (cut)
    with BuildSketch(Plane(origin=(0, 0, 0), x_dir=(1, 0, 0), z_dir=(0, 0, -1))):
        with Locations((-24.0012126607, 31.9990904686)):
            Circle(F9_R)
        with Locations((-15.5012126607, -36.87427838)):
            Circle(F9_R)
        with Locations((39.9987873393, 0.3114665041)):
            Circle(F9_R)
    extrude(amount=-F10_DEPTH, mode=Mode.SUBTRACT)


solid = f1.part
